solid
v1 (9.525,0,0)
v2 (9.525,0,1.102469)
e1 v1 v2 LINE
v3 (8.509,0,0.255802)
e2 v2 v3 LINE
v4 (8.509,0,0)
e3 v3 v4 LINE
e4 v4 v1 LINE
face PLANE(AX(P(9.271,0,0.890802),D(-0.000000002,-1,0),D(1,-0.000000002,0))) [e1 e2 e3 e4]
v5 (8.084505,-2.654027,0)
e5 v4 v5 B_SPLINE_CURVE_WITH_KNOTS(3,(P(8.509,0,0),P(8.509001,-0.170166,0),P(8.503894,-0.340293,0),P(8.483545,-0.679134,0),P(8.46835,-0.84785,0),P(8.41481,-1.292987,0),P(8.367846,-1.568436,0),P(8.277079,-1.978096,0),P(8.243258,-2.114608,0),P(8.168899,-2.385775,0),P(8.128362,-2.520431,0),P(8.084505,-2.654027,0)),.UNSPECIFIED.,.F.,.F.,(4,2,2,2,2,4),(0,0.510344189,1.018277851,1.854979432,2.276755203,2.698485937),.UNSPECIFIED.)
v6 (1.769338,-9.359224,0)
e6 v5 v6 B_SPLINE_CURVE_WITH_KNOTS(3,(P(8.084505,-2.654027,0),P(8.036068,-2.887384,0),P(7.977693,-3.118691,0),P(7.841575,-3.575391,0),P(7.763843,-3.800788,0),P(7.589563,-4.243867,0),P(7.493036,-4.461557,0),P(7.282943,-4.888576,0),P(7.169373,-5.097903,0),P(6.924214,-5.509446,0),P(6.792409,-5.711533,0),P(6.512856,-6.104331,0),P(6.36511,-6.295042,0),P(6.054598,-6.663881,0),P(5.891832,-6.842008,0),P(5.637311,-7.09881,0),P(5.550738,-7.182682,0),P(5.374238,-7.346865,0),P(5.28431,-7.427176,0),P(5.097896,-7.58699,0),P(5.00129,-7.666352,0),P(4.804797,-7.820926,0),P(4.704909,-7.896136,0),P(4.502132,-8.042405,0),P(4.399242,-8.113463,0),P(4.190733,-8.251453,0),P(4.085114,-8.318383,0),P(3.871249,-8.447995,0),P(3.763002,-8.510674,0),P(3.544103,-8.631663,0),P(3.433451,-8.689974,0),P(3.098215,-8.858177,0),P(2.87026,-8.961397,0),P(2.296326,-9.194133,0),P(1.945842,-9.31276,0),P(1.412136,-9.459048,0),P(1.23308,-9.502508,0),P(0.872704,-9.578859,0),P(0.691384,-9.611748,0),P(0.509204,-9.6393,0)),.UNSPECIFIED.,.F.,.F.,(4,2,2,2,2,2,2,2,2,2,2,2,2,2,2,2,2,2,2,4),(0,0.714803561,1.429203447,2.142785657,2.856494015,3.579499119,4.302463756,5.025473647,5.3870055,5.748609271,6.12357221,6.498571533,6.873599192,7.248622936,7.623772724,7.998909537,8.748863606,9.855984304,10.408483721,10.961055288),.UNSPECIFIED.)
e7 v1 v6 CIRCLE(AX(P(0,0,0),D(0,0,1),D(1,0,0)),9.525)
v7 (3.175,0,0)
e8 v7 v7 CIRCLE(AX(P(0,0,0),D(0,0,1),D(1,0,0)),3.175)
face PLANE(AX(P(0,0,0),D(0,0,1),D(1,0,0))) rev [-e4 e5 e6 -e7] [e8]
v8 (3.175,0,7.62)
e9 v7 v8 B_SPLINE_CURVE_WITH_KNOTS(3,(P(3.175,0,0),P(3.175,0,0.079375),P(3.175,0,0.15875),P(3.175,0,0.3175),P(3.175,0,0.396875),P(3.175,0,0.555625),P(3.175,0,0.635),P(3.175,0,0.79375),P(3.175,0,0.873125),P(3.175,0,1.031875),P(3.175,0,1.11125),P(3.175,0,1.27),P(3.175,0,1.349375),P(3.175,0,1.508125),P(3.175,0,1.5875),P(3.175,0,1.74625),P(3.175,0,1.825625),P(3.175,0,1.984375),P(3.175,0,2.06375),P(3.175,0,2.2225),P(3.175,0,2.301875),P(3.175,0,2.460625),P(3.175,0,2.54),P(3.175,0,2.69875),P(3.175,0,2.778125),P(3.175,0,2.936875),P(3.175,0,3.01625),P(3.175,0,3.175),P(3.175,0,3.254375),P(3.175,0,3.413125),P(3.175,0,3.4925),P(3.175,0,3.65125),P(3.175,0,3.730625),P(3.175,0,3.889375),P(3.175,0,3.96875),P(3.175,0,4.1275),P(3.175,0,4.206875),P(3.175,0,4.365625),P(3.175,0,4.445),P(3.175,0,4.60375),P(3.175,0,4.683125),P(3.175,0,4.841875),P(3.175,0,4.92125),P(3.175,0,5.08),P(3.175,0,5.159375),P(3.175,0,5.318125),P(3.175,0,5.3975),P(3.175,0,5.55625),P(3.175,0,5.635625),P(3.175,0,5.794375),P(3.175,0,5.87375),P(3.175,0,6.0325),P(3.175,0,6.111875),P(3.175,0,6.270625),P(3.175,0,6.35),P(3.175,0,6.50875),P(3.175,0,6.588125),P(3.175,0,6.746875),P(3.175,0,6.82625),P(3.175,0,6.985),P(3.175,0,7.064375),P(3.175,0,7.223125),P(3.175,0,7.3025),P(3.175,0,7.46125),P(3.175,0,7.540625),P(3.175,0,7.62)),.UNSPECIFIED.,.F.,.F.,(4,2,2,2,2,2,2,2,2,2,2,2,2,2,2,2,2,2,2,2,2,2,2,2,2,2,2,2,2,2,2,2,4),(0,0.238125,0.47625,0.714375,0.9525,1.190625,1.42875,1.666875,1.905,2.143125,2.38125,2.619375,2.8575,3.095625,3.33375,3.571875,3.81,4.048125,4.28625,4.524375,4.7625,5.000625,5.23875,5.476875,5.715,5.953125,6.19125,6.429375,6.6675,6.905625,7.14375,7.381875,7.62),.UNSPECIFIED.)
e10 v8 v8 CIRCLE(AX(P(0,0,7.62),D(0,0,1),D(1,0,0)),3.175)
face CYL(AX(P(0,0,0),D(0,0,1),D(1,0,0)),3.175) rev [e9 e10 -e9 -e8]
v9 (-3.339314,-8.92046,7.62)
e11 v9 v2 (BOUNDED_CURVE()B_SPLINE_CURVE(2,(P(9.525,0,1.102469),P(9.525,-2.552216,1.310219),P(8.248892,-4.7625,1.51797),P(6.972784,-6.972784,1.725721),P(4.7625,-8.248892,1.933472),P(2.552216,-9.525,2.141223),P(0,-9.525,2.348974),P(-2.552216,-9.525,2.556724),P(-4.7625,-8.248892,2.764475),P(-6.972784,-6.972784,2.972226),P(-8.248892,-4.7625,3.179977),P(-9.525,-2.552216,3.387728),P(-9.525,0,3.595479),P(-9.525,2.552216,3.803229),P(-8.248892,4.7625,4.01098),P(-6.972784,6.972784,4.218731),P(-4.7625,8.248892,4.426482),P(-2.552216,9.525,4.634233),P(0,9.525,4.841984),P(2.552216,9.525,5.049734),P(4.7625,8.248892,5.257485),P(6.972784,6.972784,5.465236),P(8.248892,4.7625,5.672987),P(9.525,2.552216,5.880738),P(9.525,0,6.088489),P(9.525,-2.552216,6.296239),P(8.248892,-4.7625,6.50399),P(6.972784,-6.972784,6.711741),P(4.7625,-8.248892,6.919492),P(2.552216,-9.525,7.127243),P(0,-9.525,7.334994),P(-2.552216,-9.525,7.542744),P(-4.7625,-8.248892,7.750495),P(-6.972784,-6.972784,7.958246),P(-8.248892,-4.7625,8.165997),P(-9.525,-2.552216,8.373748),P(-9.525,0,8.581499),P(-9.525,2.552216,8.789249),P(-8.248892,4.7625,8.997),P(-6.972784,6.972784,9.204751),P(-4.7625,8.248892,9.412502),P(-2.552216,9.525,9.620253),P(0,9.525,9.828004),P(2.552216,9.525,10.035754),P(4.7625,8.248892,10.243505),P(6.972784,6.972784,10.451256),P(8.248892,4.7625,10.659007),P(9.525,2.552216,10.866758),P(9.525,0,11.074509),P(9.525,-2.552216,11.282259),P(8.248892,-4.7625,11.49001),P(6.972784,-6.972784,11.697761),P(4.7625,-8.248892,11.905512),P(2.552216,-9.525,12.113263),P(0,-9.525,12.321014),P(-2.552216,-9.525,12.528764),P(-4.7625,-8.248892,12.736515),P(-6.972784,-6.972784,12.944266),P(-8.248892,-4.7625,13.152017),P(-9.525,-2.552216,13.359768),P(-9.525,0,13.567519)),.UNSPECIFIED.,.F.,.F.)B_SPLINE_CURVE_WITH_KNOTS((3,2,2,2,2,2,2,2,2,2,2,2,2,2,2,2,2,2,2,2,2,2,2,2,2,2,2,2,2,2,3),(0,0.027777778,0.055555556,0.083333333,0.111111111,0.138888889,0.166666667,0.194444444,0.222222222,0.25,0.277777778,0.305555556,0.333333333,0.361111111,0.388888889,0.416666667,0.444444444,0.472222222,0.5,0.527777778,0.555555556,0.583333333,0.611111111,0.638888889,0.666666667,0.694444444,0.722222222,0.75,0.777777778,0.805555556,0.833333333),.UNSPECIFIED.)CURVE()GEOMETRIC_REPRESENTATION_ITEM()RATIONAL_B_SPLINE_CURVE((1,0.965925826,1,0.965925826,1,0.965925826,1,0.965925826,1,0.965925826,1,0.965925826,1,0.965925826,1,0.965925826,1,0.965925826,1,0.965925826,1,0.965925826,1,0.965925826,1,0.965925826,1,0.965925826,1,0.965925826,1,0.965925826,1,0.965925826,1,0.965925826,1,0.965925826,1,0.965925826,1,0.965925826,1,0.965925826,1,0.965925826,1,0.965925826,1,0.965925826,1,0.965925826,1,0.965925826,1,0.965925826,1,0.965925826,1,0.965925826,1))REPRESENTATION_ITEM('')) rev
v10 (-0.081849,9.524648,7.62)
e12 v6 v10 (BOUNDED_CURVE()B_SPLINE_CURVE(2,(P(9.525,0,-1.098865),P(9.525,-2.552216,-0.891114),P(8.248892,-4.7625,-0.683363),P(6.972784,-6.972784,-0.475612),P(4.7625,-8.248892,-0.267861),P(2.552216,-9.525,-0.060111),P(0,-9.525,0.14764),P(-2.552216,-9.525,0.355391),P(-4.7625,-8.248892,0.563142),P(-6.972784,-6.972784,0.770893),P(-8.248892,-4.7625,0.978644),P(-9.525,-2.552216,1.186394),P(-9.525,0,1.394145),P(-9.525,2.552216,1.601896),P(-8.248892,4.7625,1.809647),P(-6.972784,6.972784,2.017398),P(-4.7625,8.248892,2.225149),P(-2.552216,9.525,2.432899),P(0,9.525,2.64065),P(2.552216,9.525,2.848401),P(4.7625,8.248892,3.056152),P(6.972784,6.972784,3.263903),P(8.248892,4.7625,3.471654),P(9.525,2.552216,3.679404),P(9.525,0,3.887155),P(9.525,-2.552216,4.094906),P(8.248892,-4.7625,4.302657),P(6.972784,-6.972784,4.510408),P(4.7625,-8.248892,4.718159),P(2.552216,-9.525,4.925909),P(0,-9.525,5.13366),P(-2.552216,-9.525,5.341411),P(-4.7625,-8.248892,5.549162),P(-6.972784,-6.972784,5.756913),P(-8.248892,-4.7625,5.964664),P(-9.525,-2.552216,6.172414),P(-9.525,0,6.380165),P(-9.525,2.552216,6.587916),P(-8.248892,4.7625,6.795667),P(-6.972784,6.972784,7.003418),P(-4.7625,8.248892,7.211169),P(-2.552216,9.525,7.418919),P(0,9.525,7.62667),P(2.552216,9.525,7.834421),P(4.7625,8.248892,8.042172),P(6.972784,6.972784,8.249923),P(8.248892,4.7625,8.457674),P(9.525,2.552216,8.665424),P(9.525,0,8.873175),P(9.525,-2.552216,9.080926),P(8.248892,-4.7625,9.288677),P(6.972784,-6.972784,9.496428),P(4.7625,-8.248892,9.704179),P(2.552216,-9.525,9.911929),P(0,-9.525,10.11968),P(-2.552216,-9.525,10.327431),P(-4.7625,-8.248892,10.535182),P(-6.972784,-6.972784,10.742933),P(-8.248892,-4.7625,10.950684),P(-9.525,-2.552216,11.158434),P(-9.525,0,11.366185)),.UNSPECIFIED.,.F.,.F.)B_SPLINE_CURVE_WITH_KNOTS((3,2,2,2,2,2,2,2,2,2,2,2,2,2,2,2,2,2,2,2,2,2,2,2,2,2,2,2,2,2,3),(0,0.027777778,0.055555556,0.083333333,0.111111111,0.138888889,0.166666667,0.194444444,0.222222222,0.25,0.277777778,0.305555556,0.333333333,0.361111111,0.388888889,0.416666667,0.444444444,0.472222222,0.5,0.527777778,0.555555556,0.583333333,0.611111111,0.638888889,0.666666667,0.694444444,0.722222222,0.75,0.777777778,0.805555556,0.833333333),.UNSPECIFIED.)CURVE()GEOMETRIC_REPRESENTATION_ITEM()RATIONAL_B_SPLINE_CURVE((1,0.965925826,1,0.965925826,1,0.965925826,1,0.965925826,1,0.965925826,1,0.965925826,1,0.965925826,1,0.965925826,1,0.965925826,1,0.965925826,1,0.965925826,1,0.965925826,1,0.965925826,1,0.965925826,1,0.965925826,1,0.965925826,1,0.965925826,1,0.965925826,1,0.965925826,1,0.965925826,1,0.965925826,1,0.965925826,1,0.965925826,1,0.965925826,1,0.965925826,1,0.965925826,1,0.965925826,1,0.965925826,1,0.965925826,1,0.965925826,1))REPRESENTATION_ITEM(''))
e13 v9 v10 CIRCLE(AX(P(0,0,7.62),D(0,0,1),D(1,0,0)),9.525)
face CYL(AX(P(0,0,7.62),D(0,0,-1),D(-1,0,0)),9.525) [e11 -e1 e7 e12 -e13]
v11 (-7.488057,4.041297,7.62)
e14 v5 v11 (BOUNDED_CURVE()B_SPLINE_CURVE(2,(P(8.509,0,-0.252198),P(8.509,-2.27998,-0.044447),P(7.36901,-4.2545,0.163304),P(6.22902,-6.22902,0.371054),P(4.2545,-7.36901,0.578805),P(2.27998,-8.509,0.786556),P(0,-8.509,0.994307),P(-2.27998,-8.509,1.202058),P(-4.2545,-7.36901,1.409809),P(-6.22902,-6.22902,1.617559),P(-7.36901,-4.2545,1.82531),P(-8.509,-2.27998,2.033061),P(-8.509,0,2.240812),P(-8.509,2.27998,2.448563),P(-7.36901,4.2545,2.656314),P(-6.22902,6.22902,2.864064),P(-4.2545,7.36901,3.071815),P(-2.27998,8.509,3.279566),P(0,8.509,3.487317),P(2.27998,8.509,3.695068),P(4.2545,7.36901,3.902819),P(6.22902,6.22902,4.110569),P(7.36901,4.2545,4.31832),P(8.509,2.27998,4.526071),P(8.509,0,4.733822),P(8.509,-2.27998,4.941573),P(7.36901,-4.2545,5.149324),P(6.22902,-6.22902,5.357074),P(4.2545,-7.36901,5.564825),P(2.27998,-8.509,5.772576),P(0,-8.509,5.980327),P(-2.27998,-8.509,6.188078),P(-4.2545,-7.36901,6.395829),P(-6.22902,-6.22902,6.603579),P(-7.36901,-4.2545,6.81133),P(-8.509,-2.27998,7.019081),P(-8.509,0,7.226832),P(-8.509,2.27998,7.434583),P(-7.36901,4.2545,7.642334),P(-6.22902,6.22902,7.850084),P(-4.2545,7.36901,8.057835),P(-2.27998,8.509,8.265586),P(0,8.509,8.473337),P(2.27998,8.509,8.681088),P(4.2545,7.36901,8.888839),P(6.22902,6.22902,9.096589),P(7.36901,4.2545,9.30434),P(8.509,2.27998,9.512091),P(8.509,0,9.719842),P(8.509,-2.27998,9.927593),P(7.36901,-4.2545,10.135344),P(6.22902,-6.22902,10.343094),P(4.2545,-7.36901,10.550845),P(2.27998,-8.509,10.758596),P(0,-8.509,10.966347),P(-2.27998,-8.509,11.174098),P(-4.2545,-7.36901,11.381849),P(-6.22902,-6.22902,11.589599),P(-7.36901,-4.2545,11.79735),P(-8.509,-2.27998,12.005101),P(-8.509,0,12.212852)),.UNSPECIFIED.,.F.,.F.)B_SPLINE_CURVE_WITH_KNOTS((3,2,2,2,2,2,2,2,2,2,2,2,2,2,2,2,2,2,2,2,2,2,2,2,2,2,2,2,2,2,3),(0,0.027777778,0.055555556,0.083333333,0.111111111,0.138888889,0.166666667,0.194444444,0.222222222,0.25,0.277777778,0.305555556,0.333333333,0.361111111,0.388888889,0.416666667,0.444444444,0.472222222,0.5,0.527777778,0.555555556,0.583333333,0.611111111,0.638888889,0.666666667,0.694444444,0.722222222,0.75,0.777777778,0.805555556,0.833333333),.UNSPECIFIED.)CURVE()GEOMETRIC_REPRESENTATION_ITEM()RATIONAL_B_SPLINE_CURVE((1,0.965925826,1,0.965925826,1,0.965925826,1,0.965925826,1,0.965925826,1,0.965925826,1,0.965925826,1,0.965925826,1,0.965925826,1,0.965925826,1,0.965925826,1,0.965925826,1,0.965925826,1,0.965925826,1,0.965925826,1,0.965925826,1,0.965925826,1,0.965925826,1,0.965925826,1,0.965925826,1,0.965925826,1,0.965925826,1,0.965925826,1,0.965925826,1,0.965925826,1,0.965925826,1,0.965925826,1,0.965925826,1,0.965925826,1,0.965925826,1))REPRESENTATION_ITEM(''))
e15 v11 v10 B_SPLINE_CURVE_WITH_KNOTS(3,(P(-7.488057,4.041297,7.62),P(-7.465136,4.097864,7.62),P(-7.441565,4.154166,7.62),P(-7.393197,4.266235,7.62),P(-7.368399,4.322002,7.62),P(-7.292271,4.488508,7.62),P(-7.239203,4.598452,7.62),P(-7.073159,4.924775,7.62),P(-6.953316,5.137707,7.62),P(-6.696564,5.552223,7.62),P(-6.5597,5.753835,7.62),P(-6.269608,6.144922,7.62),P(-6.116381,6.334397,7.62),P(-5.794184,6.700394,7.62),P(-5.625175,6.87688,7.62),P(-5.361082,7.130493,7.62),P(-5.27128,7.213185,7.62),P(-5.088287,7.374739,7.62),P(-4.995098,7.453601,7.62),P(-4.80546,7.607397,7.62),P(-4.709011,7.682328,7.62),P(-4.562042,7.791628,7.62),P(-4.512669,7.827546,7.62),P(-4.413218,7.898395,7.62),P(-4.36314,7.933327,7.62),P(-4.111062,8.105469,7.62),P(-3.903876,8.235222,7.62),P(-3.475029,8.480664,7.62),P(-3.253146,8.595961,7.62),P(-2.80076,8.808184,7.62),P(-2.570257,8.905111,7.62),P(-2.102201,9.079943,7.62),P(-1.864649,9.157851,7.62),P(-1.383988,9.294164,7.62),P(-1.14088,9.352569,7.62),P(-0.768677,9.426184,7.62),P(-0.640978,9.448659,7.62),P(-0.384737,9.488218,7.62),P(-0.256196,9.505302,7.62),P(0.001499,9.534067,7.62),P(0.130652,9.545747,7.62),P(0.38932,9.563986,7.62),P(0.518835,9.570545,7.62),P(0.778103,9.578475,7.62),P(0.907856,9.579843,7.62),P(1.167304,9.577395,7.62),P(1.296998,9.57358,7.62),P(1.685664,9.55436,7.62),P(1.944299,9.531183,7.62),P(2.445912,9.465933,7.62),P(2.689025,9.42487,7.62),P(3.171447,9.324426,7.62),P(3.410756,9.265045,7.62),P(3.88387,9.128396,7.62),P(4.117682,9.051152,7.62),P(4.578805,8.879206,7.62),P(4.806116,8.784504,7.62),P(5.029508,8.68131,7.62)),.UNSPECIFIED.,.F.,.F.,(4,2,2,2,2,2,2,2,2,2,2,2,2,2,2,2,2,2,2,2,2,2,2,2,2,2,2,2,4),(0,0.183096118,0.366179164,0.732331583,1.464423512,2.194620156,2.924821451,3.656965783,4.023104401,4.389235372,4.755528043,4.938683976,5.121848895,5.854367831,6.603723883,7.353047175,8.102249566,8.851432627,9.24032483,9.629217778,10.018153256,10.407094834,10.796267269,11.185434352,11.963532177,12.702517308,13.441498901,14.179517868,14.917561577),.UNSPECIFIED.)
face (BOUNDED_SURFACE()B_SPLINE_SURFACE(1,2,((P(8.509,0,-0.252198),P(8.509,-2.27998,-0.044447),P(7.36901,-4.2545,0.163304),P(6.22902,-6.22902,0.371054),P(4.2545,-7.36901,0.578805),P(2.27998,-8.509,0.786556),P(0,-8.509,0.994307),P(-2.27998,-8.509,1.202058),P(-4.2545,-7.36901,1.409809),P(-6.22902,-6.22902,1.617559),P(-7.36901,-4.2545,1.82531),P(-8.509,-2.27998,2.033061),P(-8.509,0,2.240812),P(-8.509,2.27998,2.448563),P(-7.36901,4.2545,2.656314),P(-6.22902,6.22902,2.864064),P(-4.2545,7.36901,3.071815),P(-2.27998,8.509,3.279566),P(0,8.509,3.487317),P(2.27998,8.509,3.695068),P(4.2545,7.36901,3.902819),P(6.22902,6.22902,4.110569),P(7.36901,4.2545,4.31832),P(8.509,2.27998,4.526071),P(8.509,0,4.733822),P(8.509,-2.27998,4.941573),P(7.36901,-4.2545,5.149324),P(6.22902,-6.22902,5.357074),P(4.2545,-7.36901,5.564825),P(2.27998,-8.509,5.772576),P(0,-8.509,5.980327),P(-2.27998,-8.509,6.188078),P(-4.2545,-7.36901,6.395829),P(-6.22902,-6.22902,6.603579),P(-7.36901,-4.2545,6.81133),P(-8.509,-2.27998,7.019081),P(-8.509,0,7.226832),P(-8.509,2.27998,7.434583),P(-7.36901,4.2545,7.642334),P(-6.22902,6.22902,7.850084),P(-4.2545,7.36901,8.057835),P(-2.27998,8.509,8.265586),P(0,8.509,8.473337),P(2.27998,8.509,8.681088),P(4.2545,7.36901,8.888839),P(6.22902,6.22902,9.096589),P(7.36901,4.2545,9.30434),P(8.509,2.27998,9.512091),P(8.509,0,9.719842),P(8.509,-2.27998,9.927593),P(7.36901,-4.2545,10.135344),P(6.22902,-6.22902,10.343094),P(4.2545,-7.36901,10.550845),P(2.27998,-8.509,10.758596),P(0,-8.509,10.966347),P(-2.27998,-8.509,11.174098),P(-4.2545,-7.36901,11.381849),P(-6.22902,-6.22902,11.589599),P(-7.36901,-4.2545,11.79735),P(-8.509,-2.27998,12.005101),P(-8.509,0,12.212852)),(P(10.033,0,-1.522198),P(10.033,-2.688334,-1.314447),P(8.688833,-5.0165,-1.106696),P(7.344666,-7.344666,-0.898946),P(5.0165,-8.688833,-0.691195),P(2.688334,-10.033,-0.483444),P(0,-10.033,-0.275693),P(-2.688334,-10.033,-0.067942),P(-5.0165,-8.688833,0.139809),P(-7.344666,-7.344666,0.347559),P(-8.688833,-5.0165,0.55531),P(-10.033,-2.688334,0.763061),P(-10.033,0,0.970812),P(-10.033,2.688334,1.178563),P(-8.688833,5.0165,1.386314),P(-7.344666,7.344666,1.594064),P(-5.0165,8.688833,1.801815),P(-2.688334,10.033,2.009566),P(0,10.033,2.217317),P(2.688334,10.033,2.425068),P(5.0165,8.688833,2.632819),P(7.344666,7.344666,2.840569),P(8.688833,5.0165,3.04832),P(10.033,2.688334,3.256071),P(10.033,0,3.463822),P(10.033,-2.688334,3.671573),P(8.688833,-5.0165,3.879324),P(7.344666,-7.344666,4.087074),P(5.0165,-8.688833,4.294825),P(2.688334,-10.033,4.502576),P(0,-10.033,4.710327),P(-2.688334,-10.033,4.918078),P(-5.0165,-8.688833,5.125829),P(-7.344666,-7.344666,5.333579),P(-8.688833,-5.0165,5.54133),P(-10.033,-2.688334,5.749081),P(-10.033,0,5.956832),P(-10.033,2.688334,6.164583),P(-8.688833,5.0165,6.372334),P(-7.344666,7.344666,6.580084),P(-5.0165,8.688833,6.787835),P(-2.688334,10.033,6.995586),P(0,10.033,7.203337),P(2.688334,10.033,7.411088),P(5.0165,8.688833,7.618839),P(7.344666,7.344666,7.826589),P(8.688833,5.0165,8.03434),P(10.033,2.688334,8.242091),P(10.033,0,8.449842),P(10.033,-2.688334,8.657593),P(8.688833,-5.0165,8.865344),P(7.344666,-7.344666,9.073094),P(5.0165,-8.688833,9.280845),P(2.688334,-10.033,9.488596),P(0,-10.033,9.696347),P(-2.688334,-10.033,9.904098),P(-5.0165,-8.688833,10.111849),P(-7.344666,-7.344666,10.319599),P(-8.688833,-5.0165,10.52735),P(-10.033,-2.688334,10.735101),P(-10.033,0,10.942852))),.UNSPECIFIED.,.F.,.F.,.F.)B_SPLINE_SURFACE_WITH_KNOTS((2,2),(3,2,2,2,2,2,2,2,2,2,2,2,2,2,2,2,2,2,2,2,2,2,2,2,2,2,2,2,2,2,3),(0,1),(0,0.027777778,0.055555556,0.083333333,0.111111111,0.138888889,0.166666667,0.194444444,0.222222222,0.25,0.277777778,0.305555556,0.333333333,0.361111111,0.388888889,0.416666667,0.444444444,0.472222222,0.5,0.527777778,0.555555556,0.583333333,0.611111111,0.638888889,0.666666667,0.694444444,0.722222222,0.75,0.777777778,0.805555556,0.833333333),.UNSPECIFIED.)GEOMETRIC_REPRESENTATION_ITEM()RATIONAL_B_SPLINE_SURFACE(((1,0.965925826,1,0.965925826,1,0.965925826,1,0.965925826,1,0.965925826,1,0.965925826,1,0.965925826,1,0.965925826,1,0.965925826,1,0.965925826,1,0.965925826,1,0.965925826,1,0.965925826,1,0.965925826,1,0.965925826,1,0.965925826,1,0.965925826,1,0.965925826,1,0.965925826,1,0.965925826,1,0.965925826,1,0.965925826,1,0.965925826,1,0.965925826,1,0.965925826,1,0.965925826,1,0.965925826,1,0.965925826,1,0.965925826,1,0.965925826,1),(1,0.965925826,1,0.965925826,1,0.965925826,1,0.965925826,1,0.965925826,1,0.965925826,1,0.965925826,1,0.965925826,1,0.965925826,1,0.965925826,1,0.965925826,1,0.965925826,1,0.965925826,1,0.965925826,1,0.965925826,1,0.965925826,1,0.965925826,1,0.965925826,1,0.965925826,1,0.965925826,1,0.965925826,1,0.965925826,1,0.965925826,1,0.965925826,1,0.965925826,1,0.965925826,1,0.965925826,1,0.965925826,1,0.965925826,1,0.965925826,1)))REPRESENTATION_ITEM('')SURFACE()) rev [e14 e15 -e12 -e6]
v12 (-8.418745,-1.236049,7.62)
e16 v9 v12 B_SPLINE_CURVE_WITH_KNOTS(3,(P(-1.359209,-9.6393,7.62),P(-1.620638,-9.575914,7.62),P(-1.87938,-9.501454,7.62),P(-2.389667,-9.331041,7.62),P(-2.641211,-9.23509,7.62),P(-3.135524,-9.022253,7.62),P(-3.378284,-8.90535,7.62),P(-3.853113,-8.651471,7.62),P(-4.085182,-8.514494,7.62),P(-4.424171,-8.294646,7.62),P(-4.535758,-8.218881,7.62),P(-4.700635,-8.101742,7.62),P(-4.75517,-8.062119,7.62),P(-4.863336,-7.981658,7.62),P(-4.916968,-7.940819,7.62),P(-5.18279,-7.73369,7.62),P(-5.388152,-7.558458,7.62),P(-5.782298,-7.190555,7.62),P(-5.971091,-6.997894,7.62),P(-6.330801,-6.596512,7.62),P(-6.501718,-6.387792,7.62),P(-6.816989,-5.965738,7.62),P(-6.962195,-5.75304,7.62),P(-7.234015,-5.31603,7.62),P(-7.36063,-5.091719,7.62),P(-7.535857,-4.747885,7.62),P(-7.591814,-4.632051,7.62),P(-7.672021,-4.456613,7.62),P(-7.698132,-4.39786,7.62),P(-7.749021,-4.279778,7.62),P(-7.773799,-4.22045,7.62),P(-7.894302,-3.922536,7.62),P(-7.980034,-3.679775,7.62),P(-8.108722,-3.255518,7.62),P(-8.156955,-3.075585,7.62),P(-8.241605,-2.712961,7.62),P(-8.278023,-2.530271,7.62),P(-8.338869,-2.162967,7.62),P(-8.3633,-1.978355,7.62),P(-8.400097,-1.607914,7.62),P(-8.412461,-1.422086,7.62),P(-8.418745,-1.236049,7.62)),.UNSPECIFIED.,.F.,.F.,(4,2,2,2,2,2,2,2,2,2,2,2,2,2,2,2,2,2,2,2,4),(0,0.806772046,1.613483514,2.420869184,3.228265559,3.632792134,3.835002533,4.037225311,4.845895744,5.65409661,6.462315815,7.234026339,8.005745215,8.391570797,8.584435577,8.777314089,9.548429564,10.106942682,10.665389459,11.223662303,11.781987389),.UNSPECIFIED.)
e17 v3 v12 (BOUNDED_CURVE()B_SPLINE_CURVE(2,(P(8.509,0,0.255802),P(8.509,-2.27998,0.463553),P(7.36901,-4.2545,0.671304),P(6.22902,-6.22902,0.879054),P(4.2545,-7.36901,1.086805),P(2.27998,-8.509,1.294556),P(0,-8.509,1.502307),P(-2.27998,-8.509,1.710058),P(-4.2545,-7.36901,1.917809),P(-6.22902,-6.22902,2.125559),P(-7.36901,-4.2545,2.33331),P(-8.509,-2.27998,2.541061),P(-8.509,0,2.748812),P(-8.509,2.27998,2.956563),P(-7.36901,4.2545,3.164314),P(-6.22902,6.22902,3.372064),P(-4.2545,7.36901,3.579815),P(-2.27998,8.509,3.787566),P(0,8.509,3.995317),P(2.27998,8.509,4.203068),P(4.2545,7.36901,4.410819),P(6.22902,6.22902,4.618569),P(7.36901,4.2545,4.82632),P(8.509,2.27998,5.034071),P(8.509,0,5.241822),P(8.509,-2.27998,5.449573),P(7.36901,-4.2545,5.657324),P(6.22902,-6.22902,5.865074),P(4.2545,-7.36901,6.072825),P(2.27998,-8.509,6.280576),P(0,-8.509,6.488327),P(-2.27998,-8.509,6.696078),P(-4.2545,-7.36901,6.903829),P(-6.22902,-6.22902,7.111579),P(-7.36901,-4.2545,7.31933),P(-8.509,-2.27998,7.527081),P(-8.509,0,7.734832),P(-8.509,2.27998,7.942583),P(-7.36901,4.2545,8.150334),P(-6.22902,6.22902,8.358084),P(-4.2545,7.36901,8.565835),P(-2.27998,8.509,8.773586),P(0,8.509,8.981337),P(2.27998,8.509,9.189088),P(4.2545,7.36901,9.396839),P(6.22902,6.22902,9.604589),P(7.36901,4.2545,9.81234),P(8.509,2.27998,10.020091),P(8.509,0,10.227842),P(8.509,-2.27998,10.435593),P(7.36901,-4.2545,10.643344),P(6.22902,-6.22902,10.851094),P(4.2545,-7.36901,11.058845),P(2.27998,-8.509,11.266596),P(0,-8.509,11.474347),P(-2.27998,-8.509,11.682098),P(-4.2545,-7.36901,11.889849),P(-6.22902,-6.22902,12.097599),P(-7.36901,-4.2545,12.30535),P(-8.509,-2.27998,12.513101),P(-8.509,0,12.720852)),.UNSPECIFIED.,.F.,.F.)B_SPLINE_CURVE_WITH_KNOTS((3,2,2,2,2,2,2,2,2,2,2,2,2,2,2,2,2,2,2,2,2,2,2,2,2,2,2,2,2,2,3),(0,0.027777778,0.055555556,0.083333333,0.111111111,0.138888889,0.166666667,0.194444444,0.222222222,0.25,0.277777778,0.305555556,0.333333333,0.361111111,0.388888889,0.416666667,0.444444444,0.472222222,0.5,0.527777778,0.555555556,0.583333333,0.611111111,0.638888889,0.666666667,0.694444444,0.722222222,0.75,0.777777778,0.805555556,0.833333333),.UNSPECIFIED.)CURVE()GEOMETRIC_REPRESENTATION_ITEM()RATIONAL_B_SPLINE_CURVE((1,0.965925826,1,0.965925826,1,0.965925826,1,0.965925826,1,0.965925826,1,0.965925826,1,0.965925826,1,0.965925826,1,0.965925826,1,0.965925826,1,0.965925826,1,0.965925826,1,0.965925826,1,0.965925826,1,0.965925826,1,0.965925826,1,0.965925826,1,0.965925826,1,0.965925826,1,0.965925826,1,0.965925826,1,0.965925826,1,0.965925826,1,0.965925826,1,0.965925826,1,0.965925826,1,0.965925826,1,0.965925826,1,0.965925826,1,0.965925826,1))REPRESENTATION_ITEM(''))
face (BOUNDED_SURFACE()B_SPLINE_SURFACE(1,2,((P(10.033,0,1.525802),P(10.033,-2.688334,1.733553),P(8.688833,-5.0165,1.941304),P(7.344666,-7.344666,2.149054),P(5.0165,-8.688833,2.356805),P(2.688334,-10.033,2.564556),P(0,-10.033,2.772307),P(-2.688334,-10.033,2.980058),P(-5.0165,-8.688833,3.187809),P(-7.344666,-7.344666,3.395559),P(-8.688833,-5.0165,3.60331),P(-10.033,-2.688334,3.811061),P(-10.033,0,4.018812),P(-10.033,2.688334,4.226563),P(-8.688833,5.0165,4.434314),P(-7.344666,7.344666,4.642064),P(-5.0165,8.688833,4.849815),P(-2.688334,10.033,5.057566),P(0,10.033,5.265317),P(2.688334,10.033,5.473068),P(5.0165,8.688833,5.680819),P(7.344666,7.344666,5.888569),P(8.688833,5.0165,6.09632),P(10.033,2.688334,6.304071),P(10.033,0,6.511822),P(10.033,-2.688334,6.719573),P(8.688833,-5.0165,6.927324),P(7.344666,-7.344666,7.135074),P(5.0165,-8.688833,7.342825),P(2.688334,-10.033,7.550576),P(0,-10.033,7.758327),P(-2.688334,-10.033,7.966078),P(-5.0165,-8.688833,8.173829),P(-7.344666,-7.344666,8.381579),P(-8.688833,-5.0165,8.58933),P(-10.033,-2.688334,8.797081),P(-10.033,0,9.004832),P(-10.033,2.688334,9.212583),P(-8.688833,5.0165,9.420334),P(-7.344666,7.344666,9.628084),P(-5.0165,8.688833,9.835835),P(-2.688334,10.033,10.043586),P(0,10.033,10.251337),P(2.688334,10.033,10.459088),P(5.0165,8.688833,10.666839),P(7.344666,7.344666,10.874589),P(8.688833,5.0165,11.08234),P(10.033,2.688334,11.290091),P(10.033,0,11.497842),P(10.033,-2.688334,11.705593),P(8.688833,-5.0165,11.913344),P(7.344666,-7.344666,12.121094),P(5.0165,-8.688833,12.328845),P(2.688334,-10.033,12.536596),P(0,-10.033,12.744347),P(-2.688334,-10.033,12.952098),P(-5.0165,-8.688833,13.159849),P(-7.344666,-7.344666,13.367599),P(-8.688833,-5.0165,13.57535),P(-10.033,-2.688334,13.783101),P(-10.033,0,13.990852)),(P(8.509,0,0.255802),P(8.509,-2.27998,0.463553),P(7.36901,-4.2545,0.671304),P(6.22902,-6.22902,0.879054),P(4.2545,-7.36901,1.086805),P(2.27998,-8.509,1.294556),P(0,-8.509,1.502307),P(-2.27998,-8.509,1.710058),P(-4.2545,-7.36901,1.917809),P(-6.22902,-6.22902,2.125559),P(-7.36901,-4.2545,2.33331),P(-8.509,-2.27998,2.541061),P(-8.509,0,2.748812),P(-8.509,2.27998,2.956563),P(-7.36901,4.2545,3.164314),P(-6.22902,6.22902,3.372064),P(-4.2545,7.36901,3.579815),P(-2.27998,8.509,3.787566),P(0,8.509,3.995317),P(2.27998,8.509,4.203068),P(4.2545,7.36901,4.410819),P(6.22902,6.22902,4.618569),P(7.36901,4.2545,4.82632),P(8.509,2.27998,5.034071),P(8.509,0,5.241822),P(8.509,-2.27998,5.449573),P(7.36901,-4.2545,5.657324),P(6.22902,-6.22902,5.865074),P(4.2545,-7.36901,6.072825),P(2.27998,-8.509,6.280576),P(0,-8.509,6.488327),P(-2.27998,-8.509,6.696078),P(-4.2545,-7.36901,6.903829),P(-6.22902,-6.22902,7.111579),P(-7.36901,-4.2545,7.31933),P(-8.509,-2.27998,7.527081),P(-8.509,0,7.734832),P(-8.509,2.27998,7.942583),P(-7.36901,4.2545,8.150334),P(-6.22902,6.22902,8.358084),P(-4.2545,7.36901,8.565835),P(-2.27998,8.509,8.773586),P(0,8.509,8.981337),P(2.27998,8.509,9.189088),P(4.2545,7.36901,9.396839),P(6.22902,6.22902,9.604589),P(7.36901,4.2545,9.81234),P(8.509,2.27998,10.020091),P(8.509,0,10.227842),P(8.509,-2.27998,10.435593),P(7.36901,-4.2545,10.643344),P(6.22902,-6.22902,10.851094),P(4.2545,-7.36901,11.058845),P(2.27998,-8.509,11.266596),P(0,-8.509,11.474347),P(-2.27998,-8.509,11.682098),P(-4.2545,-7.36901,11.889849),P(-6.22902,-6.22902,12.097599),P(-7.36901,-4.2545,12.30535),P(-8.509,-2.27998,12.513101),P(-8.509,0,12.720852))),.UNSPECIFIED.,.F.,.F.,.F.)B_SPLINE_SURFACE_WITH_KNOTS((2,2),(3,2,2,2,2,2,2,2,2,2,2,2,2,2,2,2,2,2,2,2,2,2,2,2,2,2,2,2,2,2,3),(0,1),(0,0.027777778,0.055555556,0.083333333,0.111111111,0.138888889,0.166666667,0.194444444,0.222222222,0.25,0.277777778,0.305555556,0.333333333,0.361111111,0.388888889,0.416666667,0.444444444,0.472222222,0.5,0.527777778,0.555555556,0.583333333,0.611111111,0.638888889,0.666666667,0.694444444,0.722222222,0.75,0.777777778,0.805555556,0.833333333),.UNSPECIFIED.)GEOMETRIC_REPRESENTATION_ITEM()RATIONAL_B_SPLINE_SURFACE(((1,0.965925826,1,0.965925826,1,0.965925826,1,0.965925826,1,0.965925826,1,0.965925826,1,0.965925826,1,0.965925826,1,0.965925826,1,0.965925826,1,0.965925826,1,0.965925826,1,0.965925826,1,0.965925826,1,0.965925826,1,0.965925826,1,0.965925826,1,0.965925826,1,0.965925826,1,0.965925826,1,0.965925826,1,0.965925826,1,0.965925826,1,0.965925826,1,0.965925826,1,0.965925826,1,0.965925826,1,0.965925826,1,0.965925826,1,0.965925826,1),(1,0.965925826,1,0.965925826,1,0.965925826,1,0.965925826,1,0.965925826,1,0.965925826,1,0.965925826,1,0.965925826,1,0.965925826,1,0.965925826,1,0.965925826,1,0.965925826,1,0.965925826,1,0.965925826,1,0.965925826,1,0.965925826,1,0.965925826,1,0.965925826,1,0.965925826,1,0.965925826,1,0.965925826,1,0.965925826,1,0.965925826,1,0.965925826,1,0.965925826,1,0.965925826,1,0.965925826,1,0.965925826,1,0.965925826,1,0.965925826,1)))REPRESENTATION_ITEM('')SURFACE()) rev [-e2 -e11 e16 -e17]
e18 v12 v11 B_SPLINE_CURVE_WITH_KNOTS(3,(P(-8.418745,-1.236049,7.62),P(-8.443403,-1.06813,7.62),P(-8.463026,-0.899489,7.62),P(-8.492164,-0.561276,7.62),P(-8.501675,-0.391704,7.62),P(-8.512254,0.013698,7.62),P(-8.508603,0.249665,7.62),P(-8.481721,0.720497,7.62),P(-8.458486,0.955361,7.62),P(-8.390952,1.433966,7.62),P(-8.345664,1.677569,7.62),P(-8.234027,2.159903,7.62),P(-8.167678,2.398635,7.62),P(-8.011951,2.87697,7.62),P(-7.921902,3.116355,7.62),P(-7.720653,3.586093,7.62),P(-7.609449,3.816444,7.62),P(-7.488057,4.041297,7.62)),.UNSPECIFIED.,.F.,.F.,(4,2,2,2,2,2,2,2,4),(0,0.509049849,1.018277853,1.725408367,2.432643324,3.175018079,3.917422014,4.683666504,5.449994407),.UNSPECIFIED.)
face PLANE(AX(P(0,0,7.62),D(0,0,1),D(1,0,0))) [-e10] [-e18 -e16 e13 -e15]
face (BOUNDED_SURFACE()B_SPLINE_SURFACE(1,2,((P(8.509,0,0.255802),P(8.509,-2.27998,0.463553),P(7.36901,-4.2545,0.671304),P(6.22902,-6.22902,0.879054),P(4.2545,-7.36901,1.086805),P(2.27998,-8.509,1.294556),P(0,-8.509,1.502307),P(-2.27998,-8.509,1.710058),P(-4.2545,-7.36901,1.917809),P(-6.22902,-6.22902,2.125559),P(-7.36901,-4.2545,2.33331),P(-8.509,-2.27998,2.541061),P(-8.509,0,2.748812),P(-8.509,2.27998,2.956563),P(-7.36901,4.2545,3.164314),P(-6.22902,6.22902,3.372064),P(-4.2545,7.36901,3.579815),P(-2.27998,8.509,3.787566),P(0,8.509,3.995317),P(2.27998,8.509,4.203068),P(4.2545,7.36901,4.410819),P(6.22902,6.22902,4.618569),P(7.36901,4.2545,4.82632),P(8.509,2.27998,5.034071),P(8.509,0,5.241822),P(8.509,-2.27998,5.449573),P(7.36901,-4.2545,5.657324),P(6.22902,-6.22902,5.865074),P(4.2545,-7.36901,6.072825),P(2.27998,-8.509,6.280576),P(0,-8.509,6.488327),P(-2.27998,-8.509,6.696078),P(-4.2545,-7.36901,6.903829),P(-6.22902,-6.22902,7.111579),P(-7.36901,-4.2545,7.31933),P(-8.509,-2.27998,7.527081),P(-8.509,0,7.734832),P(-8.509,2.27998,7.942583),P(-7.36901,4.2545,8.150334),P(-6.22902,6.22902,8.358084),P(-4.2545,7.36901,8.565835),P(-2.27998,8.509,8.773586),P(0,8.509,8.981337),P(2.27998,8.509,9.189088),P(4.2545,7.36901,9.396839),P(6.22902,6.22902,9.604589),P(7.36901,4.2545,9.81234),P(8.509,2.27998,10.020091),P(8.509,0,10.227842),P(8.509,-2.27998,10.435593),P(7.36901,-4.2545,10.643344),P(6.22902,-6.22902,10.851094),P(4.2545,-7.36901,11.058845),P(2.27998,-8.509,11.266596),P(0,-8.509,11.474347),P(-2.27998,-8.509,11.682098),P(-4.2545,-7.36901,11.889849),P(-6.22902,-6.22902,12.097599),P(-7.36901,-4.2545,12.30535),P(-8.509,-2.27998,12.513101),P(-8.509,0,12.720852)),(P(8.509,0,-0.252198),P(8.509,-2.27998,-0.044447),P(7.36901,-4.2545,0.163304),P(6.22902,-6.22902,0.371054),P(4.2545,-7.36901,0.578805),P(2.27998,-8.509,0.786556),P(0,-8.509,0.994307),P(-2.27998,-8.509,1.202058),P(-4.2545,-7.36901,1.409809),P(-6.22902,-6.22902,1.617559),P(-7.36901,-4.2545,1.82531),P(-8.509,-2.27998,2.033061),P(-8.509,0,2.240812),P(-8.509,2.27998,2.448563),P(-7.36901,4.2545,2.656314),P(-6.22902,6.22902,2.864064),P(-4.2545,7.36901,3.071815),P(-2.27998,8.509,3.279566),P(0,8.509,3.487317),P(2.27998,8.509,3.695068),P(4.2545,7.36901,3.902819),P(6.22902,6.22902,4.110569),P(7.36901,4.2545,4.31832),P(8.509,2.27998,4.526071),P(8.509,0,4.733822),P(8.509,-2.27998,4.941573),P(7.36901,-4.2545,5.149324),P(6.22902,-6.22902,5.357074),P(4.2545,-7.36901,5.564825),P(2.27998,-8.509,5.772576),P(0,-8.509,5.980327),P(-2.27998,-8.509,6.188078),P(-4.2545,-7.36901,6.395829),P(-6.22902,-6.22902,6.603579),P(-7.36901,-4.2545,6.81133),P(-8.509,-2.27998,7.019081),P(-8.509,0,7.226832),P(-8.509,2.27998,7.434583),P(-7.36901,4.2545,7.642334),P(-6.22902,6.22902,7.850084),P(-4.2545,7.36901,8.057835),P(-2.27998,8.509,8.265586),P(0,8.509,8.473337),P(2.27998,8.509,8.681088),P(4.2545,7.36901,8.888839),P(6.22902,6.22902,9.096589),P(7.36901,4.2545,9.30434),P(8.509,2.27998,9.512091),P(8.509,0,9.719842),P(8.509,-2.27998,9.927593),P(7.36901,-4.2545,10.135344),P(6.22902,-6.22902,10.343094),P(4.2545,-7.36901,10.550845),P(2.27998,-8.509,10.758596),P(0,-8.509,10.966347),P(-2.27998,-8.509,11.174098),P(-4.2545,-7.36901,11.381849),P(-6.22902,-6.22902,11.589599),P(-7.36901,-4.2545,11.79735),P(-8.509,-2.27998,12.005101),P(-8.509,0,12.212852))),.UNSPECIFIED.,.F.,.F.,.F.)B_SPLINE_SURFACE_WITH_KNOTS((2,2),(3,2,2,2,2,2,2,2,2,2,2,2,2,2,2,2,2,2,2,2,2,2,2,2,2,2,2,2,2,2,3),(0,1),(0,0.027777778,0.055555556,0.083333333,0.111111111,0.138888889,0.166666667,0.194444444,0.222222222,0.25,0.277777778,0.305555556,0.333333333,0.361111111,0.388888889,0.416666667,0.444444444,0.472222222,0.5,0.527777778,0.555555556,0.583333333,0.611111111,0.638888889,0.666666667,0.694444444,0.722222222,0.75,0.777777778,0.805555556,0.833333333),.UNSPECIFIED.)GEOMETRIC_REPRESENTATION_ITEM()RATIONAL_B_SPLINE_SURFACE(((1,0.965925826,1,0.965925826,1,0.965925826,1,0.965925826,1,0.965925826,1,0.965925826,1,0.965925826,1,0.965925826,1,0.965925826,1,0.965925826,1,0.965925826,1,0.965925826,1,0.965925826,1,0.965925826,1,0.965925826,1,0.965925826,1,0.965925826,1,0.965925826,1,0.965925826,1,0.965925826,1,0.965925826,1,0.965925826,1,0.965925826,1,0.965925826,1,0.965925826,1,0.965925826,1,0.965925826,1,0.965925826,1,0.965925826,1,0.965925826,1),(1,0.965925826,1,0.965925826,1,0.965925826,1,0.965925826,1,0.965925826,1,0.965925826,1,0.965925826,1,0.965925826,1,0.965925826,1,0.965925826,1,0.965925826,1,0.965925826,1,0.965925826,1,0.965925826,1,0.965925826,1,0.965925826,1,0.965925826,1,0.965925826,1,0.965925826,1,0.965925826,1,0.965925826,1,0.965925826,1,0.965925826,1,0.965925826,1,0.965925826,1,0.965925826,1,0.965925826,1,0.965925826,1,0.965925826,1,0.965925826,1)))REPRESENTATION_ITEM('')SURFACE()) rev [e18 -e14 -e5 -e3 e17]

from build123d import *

# Parameters (mm, degrees)
SKETCH1_R           = 9.525
BOSS_EXTRUDE1_DEPTH = 7.62
SKETCH2_R           = 3.175
CUT_EXTRUDE1_DEPTH  = 16.476293161
CUT_SWEEP5_PITCH    = 4.98602


with BuildPart() as part:
    # Sketch1 → Boss-Extrude1 (new body)
    with BuildSketch(Plane.XY):
        with Locations(Location((0, 0, 0), (0, 0, 180))):
            Circle(SKETCH1_R)
    extrude(amount=BOSS_EXTRUDE1_DEPTH)

    # Sketch2 → Cut-Extrude1 (cut, through all)
    with BuildSketch(Plane.XY.offset(7.62)):
        Circle(SKETCH2_R)
    extrude(amount=-CUT_EXTRUDE1_DEPTH, mode=Mode.SUBTRACT)

    # Cut-Sweep5: arcs per turn and ends read off the stored shape
    # Cut-Sweep5: the profile of Sketch6 screwed along a left-hand helix through 2.5 turns, 12 arcs to a turn; built about Z, then put on its axis
    cut_sweep5_z = Axis((0, 0, 0), (0, 0, 1))
    cut_sweep5_corners = [(10.033, 2e-08, -1.522198128), (10.033, 2e-08, 1.525801872), (8.509, 1.7e-08, 0.255801872), (8.509, 1.7e-08, -0.252198128)]
    with BuildLine(mode=Mode.PRIVATE) as cut_sweep5_profile:
        Line(cut_sweep5_corners[0], cut_sweep5_corners[1])
        Line(cut_sweep5_corners[1], cut_sweep5_corners[2])
        Line(cut_sweep5_corners[2], cut_sweep5_corners[3])
        Line(cut_sweep5_corners[3], cut_sweep5_corners[0])
    cut_sweep5_cap = Face(cut_sweep5_profile.wire())
    cut_sweep5_turn_angles = [0, -15, -30, -45, -60, -75, -90, -105, -120, -135, -150, -165, -180, -195, -210, -225, -240, -255, -270, -285, -300, -315, -330, -345, -360]
    cut_sweep5_turn_weights = [1, 0.9659258262890683, 1, 0.9659258262890683, 1, 0.9659258262890683, 1, 0.9659258262890683, 1, 0.9659258262890683, 1, 0.9659258262890683, 1, 0.9659258262890683, 1, 0.9659258262890683, 1, 0.9659258262890683, 1, 0.9659258262890683, 1, 0.9659258262890683, 1, 0.9659258262890683, 1]
    cut_sweep5_turn_rails = [Edge.make_bspline([Vector(p[0], p[1], 0).rotate(cut_sweep5_z, cut_sweep5_turn_angles[k]) / cut_sweep5_turn_weights[k] + Vector(0, 0, p[2] + -CUT_SWEEP5_PITCH * cut_sweep5_turn_angles[k] / 360) for k in range(25)], [0, 0, 0, 1, 1, 2, 2, 3, 3, 4, 4, 5, 5, 6, 6, 7, 7, 8, 8, 9, 9, 10, 10, 11, 11, 12, 12, 12], 2, cut_sweep5_turn_weights) for p in cut_sweep5_corners]
    cut_sweep5_turn_sides = [Face.make_surface_from_curves(cut_sweep5_turn_rails[p[0]], cut_sweep5_turn_rails[p[1]]) for p in [(0, 1), (1, 2), (2, 3), (3, 0)]]
    cut_sweep5_last_angles = [-720, -735, -750, -765, -780, -795, -810, -825, -840, -855, -870, -885, -900]
    cut_sweep5_last_weights = [1, 0.9659258262890683, 1, 0.9659258262890683, 1, 0.9659258262890683, 1, 0.9659258262890683, 1, 0.9659258262890683, 1, 0.9659258262890683, 1]
    cut_sweep5_last_rails = [Edge.make_bspline([Vector(p[0], p[1], 0).rotate(cut_sweep5_z, cut_sweep5_last_angles[k]) / cut_sweep5_last_weights[k] + Vector(0, 0, p[2] + -CUT_SWEEP5_PITCH * cut_sweep5_last_angles[k] / 360) for k in range(13)], [0, 0, 0, 1, 1, 2, 2, 3, 3, 4, 4, 5, 5, 6, 6, 6], 2, cut_sweep5_last_weights) for p in cut_sweep5_corners]
    cut_sweep5_last_sides = [Face.make_surface_from_curves(cut_sweep5_last_rails[p[0]], cut_sweep5_last_rails[p[1]]) for p in [(0, 1), (1, 2), (2, 3), (3, 0)]]
    cut_sweep5 = Plane(origin=(0, 0, 0), x_dir=(1, 0, 0), z_dir=(0, 0, 1)) * Solid(Shell([*[p.moved(Location((0, 0, CUT_SWEEP5_PITCH * i))) for i in range(2) for p in cut_sweep5_turn_sides], *cut_sweep5_last_sides, cut_sweep5_cap, cut_sweep5_cap.rotate(cut_sweep5_z, -900).moved(Location((0, 0, -CUT_SWEEP5_PITCH * -900 / 360)))]))
    add(cut_sweep5, mode=Mode.SUBTRACT)


solid = part.part
